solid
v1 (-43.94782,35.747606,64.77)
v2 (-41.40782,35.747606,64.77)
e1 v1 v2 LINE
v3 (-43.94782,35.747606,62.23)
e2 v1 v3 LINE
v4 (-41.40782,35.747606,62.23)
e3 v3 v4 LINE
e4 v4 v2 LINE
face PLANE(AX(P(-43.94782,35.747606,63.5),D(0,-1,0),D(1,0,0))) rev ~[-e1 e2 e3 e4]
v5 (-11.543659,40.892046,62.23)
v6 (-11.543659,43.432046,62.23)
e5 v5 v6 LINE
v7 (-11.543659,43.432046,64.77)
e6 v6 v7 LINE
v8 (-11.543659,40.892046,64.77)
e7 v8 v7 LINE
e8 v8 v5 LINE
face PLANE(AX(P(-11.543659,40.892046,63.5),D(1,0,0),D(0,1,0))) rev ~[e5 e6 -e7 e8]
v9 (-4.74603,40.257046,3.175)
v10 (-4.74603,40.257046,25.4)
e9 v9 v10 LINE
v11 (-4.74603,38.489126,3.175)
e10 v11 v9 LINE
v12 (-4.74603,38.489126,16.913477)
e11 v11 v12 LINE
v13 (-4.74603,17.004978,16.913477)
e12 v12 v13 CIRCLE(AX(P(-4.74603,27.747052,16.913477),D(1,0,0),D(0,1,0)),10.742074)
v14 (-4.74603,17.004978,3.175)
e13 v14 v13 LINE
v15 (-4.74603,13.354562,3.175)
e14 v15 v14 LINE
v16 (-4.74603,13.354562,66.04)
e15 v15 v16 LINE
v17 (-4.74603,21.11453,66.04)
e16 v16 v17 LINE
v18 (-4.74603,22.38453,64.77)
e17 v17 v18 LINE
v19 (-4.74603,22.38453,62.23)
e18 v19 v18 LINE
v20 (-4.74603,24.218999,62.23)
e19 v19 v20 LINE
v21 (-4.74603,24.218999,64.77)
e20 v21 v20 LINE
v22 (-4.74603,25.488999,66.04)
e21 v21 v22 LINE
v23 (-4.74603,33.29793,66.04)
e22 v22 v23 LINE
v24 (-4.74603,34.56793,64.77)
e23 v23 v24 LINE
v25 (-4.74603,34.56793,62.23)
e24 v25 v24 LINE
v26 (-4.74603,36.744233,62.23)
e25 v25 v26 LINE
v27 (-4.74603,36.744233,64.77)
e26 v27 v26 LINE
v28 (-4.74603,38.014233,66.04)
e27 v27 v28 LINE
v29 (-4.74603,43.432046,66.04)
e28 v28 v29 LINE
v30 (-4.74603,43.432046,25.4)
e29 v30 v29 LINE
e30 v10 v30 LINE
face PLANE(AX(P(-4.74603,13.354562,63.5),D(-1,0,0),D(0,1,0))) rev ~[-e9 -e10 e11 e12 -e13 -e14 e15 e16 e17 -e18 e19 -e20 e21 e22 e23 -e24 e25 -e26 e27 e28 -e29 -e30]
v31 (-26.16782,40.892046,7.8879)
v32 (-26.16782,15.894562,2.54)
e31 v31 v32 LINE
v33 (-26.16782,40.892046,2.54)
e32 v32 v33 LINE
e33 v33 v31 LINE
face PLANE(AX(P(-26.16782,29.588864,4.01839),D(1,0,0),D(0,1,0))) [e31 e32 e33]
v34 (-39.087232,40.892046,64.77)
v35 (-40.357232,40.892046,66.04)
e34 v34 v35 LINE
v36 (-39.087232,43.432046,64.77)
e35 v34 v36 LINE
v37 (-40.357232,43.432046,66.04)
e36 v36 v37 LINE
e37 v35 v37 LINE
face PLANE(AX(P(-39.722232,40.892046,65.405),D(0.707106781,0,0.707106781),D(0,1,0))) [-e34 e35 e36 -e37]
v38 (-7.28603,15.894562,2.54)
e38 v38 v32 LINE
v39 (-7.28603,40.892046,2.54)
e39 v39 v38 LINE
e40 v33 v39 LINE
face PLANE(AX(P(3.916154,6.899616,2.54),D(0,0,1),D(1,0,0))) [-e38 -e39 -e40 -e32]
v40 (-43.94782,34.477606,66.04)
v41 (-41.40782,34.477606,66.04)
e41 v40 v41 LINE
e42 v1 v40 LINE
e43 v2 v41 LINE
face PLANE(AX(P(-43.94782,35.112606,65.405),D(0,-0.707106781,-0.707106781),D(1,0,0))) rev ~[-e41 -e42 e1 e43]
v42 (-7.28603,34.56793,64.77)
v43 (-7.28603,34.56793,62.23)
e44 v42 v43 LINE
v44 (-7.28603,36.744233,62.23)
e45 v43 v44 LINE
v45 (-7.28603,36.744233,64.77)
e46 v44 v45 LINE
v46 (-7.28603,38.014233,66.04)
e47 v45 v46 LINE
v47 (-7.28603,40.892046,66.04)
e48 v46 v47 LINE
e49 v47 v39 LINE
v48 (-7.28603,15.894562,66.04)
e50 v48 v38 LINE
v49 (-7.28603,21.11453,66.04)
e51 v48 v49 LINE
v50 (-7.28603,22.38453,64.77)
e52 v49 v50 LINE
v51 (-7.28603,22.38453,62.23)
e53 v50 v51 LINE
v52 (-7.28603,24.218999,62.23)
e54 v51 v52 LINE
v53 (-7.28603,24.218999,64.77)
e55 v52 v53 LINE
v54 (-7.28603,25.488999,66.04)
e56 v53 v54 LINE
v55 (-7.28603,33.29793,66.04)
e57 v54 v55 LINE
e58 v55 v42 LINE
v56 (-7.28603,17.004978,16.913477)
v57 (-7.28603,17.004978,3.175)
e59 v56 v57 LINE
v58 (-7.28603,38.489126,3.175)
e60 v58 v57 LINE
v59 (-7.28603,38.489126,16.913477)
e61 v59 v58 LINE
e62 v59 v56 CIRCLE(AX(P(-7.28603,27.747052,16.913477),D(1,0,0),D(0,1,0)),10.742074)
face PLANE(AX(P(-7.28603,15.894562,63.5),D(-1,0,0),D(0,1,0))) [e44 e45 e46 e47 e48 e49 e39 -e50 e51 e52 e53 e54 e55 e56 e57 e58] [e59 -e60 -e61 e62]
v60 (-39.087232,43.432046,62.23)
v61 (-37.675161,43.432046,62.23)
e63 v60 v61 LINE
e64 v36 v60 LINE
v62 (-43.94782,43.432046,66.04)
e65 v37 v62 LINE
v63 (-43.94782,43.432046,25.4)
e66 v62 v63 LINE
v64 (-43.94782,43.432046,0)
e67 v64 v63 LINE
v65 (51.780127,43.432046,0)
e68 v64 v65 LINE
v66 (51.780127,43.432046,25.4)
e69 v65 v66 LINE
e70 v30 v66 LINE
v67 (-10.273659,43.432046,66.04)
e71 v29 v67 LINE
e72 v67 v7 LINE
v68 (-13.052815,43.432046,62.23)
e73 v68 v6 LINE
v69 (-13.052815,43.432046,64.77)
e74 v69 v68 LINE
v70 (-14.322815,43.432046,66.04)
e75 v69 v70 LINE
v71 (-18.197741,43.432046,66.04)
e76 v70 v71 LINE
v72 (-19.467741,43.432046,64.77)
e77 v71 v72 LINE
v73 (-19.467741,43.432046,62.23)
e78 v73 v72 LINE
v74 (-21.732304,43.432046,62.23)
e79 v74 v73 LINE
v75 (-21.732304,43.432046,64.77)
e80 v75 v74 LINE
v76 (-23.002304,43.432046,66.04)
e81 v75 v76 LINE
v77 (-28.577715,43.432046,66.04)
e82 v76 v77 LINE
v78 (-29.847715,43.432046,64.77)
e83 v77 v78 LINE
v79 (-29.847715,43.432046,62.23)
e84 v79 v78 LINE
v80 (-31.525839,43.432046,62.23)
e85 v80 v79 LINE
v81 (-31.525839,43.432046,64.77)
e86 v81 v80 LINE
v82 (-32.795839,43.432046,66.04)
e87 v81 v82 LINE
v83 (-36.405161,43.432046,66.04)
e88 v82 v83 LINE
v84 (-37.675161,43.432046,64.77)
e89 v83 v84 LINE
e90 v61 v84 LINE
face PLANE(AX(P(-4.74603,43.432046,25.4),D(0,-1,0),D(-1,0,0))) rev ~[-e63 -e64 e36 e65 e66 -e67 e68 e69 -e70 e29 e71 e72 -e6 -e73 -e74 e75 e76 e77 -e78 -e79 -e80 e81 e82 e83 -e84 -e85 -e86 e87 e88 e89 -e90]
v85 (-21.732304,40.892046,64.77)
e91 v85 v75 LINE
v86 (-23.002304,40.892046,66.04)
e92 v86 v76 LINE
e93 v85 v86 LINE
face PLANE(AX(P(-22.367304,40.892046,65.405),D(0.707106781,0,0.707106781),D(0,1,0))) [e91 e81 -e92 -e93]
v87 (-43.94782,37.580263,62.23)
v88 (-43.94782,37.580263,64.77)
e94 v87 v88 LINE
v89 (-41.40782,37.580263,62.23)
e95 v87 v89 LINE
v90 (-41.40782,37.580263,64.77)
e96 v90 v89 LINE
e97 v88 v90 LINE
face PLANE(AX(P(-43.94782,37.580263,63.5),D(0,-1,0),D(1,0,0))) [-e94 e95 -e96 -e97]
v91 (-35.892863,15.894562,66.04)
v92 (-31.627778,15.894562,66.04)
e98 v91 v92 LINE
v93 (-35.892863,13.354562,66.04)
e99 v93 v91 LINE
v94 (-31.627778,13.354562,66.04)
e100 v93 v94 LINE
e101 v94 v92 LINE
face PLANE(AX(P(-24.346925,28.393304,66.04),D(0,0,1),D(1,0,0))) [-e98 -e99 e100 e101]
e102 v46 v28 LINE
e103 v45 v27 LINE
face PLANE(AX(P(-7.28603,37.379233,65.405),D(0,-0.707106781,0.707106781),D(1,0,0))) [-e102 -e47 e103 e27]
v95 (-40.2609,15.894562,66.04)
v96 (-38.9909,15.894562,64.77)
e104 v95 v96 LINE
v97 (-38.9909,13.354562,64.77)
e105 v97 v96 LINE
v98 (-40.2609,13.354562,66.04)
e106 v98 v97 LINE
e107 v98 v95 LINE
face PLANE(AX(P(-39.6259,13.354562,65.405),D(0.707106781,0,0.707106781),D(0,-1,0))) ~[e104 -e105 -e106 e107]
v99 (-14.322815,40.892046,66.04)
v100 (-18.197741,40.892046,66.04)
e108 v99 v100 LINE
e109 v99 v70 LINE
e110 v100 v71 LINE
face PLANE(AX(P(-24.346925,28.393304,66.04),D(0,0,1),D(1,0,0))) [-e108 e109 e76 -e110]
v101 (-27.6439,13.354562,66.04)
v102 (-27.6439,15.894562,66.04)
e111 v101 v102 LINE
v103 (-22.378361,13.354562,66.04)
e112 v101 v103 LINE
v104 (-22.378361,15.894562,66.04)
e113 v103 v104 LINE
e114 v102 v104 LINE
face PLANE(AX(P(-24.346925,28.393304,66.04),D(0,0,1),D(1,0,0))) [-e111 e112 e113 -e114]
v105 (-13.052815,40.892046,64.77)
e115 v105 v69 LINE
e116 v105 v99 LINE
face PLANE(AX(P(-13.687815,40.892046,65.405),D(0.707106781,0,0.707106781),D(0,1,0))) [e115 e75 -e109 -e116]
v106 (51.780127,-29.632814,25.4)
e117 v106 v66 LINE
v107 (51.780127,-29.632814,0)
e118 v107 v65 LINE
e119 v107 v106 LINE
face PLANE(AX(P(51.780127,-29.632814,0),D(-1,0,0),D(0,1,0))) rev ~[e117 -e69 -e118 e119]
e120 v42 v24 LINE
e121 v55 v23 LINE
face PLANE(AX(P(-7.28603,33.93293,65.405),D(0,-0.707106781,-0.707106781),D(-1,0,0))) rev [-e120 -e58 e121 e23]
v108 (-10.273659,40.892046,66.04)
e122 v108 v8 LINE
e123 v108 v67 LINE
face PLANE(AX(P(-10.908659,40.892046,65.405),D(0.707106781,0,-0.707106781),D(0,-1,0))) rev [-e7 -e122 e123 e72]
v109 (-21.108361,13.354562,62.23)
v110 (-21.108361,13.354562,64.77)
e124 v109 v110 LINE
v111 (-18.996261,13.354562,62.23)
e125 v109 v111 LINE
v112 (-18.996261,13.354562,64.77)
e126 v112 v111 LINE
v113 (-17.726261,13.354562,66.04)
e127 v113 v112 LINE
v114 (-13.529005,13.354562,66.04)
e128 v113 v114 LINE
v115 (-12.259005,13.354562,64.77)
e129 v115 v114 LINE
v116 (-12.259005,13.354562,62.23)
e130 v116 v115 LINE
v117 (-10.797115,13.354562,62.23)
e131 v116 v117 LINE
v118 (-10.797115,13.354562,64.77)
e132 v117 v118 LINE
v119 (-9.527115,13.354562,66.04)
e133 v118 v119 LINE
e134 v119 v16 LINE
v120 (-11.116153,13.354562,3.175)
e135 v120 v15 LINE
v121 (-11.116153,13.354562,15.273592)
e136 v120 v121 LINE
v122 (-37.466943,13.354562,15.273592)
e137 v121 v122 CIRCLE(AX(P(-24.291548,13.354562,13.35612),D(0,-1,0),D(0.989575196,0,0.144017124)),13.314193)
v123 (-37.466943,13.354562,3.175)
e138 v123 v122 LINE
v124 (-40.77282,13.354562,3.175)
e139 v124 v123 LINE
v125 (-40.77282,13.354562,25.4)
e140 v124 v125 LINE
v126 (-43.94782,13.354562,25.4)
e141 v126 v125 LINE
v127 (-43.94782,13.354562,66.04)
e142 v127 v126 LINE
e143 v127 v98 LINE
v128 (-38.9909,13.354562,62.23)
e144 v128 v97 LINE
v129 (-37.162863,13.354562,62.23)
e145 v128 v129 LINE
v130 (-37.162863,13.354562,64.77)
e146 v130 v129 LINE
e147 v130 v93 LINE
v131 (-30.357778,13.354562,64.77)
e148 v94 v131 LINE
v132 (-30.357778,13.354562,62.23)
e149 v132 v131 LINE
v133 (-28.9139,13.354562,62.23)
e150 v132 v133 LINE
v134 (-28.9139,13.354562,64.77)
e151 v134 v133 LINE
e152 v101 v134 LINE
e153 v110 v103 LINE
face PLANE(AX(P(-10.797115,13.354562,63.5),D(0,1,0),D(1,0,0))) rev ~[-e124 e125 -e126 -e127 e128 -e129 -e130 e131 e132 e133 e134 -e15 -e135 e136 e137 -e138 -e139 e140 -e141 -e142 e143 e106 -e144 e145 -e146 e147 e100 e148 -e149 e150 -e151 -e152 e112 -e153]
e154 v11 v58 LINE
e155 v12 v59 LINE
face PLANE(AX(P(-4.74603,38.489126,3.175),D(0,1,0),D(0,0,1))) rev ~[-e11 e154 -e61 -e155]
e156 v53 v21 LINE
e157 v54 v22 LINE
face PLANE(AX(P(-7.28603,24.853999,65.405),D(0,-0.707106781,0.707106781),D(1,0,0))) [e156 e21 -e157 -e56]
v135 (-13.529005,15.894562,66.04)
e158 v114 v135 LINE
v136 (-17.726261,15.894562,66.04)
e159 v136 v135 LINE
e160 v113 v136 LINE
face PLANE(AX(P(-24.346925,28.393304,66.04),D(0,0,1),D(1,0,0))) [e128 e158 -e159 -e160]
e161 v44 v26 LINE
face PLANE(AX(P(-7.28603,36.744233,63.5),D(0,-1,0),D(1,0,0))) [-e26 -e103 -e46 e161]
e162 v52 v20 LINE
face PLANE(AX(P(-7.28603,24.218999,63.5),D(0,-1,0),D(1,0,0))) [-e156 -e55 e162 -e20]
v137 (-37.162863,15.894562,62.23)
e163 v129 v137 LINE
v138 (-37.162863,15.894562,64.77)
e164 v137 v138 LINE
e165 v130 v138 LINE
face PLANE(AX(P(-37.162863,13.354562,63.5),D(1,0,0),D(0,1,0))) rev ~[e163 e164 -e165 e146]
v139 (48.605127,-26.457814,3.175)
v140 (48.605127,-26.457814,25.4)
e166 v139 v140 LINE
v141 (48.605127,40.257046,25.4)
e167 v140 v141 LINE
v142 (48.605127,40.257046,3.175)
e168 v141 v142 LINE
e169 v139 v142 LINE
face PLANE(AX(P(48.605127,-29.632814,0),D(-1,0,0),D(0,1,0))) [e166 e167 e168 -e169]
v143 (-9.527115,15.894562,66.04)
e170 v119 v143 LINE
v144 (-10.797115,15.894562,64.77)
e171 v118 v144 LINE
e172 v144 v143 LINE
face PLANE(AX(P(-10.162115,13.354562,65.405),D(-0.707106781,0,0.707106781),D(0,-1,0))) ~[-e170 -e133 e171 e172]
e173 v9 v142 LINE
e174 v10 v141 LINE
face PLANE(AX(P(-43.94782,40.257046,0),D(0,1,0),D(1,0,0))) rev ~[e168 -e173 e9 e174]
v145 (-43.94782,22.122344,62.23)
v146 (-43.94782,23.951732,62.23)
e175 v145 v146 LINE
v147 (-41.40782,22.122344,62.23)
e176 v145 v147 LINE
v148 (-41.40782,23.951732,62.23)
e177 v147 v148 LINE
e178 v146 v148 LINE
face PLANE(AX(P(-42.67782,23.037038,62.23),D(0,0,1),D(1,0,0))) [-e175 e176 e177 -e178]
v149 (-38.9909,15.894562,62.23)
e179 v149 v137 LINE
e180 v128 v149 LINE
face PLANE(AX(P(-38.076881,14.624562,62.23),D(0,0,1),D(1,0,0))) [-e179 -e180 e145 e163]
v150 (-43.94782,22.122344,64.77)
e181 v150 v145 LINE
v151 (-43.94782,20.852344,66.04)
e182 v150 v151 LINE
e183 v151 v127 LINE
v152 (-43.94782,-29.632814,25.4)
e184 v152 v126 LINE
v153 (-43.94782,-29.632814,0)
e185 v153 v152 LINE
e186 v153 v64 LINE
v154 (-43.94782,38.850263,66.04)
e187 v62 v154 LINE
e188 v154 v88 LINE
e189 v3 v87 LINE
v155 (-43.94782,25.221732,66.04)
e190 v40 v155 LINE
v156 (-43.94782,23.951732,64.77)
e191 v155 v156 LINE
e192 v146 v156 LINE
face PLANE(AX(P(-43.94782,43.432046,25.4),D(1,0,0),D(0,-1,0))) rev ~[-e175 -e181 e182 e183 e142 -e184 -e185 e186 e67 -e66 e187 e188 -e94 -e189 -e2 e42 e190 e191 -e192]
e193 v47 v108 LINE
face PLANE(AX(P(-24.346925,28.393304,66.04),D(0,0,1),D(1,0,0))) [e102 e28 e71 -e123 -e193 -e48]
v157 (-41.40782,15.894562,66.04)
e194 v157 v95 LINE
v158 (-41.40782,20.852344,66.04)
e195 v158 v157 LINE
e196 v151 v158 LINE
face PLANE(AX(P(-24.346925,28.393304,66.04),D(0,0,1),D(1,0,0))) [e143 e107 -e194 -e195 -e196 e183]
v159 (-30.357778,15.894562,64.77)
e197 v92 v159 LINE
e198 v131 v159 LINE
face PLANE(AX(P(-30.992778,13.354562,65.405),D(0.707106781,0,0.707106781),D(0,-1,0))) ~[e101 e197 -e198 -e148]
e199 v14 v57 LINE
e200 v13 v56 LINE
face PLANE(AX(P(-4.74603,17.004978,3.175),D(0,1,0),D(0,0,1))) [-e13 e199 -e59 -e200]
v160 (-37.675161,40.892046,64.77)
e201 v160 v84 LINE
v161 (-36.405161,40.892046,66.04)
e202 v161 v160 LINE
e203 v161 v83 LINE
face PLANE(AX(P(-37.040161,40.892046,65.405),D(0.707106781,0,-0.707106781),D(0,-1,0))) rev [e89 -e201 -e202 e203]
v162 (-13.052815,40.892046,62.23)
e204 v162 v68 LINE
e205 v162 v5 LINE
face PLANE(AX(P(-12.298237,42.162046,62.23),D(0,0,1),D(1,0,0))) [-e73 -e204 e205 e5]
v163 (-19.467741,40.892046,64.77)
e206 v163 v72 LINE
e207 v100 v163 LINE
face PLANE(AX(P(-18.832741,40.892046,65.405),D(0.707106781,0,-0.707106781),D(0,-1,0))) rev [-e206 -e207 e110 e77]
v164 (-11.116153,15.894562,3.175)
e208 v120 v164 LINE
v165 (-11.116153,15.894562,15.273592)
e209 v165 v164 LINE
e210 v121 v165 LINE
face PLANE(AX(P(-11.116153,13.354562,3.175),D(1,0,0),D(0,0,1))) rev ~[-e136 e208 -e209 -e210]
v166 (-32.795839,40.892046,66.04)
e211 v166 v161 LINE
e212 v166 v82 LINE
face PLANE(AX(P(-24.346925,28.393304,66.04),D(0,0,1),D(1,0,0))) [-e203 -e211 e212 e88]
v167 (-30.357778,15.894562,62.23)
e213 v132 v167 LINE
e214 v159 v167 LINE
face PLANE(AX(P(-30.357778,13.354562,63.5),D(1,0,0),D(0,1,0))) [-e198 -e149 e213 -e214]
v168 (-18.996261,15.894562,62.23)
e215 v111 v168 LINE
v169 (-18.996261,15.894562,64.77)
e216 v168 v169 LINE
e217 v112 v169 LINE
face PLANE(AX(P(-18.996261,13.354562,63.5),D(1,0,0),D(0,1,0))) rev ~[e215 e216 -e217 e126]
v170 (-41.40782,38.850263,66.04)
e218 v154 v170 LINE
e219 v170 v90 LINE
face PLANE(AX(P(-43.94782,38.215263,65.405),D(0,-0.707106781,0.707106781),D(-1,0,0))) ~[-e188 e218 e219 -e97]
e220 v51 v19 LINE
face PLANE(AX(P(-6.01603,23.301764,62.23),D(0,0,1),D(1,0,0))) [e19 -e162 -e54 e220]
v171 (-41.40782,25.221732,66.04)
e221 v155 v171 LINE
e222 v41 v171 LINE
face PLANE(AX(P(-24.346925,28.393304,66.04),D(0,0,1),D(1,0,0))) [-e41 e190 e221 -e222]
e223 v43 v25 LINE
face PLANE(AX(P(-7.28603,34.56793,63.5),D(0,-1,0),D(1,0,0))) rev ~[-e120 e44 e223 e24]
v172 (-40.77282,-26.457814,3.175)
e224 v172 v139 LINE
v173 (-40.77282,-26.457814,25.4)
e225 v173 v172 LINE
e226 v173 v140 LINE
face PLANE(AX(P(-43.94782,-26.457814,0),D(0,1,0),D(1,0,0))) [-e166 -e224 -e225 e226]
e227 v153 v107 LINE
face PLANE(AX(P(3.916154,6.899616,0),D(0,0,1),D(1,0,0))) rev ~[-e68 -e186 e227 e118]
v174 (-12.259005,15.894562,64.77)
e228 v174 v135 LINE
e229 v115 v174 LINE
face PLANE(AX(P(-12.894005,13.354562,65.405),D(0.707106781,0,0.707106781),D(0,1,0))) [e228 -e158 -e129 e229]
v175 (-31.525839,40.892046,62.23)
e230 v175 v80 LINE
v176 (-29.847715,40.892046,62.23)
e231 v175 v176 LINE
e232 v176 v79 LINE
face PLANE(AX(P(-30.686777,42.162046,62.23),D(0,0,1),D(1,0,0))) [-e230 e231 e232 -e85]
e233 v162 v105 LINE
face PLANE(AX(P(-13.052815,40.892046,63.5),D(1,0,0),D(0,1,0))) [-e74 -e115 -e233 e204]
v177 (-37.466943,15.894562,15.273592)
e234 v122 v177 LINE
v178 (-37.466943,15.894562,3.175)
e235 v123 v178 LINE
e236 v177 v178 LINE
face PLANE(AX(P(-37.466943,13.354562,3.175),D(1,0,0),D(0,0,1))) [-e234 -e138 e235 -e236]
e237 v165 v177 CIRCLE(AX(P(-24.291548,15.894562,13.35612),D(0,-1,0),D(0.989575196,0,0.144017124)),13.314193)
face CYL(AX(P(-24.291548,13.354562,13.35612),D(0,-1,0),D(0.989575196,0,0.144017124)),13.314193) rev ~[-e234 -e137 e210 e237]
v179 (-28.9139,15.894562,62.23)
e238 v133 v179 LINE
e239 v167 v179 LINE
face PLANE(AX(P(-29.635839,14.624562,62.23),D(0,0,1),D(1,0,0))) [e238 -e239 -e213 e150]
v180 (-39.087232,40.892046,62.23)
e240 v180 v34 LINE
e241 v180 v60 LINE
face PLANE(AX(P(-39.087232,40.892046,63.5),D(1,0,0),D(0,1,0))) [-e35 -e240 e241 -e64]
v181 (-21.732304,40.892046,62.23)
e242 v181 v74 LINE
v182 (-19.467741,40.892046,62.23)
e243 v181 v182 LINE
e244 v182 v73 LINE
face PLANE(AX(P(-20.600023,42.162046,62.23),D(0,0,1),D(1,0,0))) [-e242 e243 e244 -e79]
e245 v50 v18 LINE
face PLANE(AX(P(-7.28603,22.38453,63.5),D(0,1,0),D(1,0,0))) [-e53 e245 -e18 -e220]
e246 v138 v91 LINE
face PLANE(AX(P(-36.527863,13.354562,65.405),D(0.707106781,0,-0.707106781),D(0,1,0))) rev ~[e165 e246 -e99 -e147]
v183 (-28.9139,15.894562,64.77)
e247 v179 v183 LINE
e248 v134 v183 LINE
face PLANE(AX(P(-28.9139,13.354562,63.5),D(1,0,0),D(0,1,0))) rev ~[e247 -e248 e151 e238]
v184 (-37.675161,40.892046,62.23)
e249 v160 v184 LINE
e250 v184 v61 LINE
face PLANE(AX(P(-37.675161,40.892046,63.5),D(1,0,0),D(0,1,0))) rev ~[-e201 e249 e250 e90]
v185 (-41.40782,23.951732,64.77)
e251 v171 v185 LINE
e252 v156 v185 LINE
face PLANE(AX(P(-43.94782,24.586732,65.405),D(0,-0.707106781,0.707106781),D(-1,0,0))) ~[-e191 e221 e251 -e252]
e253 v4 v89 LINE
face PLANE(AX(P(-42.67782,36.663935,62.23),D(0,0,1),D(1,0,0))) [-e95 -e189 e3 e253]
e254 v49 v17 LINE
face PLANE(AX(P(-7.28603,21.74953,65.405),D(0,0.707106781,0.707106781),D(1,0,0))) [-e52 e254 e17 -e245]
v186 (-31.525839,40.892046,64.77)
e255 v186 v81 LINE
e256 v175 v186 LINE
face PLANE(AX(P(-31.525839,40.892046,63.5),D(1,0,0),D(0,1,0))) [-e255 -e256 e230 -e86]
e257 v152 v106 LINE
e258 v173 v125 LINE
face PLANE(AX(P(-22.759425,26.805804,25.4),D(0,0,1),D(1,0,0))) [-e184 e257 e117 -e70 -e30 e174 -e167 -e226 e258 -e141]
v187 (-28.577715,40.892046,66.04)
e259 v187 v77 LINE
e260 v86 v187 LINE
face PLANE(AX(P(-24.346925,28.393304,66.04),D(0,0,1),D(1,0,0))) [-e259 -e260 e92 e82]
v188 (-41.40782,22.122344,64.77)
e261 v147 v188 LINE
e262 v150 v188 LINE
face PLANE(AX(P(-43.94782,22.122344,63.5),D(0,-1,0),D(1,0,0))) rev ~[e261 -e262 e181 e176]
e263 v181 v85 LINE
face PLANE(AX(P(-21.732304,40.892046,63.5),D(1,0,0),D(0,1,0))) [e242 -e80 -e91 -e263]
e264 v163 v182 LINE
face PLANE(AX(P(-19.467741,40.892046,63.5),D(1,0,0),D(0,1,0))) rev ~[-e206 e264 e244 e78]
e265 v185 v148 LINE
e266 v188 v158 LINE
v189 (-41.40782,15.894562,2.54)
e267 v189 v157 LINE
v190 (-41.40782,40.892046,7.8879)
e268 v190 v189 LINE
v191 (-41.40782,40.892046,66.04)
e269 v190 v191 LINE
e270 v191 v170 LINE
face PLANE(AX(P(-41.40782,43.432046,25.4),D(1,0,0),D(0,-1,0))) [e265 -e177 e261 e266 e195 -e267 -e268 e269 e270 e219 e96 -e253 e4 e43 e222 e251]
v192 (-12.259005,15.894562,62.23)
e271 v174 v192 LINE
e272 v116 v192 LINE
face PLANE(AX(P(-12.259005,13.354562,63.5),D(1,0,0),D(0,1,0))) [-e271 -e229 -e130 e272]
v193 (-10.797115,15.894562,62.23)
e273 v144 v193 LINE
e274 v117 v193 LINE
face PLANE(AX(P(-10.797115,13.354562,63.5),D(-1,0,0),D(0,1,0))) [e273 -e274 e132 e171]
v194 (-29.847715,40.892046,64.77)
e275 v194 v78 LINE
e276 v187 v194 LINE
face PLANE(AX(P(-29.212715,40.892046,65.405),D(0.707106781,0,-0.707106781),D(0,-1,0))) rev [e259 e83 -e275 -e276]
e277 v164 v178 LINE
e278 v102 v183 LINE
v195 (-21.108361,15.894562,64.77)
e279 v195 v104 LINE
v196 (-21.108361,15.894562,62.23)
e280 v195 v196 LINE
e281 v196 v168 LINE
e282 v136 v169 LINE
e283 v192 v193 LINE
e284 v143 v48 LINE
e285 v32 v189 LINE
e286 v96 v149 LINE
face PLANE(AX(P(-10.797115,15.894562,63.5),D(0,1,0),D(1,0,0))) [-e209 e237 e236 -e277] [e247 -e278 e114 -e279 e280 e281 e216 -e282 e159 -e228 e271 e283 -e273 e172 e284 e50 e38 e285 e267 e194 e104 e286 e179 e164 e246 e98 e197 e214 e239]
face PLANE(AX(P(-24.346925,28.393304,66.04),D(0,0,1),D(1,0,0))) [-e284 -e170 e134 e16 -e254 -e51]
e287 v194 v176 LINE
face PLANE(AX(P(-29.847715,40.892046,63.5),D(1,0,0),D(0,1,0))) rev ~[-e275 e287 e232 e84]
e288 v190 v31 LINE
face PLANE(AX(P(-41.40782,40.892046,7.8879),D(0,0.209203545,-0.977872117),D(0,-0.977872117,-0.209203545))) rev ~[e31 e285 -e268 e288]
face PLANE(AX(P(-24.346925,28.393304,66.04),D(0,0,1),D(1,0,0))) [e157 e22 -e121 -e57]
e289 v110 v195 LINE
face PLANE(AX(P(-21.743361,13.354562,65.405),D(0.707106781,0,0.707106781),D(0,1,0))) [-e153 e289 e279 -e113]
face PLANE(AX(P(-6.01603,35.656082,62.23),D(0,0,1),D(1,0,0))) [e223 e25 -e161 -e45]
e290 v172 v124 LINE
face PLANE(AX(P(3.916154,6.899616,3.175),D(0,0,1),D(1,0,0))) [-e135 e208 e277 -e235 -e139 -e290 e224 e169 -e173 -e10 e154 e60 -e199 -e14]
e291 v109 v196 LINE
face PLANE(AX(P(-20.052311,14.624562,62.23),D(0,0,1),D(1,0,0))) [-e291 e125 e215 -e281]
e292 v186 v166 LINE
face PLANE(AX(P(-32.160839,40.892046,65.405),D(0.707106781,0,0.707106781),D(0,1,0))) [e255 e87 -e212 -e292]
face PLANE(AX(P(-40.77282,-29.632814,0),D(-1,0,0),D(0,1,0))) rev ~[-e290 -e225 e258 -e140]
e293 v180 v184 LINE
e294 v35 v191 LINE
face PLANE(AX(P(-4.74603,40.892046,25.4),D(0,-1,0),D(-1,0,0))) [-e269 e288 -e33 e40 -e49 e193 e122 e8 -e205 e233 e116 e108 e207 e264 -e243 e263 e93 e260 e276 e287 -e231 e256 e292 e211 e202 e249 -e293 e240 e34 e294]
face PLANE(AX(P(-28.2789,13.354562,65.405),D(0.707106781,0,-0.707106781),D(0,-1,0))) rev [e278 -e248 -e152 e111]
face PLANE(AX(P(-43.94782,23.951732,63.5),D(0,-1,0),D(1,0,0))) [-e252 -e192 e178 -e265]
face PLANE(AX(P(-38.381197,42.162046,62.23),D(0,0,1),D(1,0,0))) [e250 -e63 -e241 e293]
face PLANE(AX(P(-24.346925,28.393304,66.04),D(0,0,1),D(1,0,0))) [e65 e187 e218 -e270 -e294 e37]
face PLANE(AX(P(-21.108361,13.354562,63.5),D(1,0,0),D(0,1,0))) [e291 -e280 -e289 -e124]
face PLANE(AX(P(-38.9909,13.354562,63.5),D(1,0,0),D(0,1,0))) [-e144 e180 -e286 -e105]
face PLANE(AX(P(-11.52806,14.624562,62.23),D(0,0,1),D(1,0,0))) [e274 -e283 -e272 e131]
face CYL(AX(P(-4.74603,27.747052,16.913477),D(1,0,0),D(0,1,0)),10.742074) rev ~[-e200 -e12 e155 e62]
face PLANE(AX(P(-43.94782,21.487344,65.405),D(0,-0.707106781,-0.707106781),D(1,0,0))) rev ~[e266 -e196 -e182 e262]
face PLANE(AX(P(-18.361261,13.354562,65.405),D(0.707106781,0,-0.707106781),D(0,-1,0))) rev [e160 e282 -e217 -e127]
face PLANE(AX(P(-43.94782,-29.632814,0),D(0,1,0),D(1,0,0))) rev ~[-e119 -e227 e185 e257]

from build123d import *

# Parameters (mm, degrees)
F0_W         = 95.7279466093
F0_H         = 73.0648599565
F1_DEPTH     = 25.4
F2_T         = -3.175
F3_W         = 36.0267900012
F3_H         = 26.902483505
F4_DEPTH     = 22.225
F6_DEPTH     = 38.1
F7_T         = 2.54
F7_T3_DEPTH  = 8.255
F7_T5_DEPTH  = 8.255
F7_T7_DEPTH  = 27.305
F7_T9_DEPTH  = 31.982483505
F7_T11_DEPTH = 41.1067900012
F7_T13_DEPTH = 58.431156608
F7_T15_DEPTH = 71.7948599565
F7_T17_DEPTH = 94.4579466093
F7_T19_DEPTH = 44.8923764515
F8_W         = 26.3507906348
F8_H         = 12.0985915035
F9_DEPTH     = 3.175
F10_W        = 21.4841477573
F10_H        = 13.7384773314
F11_DEPTH    = 3.175
F13_W        = 1.8280372024
F13_H        = 2.54
F13_W_2      = 1.4438778162
F13_W_3      = 1.4618895948
F13_W_4      = 2.1120999008
F13_W_5      = 2.54
F13_H_2      = 1.8293876201
F13_H_3      = 1.8326565623
F13_W_6      = 1.4120712876
F13_W_7      = 1.6781240702
F13_W_8      = 2.2645629942
F13_W_9      = 1.5091551468
F13_H_4      = 2.1763034165
F13_H_5      = 1.8344689161
F14_DEPTH    = 1.27
F15_DEPTH    = 2.54
F16_SIZE     = 1.27
F17_SIZE     = 1.27
F18_SIZE     = 1.27
F19_SIZE     = 1.27
F20_DEPTH    = 15.24


# Not quite as in the source:
# - a shell that OpenCascade refuses in one call is made with other operations: the cavity is built on its own and cut out


with BuildPart() as f1:
    # F0 (on Top) → F1 (new body)
    with BuildSketch(Plane.XY):
        with Locations((3.9161536843, 6.8996157497)):
            Rectangle(F0_W, F0_H)
    extrude(amount=F1_DEPTH)

    # F2
    f2_openings = [f1.faces().sort_by_distance(p)[0] for p in [
        (3.916154, 6.899616, 25.4),
    ]]
    offset(amount=F2_T, openings=f2_openings)

    # F3 (on face) → F4 (join)
    with BuildSketch(Plane.XY.offset(3.175)):
        with Locations((-22.7594246197, 26.8058039755)):
            Rectangle(F3_W, F3_H)
    extrude(amount=F4_DEPTH)

    # F5 (on face) → F6 (join)
    with BuildSketch(Plane.XY.offset(25.4)):
        Polygon((-43.9478196204, 13.354562223), (-40.7728196204, 13.354562223), (-4.7460296191, 13.354562223), (-4.7460296191, 40.257045728), (-4.7460296191, 43.432045728), (-43.9478196204, 43.432045728), align=None)
    extrude(amount=F6_DEPTH)

    # F7: shell of thickness 2.54, made by hand


with BuildPart() as f7_core1:
    # F7_t2: copy of F1
    add(f1.part)

    # the walls: a layer under each face that stays
    f7_faces = [f7_core1.faces().sort_by_distance(p)[0] for p in [
        (-43.9478196204, 31.2545690686, 52.9166666667),
        (3.9161536843, 6.8996157497, 0),
        (51.7801269889, 6.8996157497, 12.7),
        (3.9161536843, -29.6328142285, 12.7),
        (-40.7568880667, -27.1973188967, 25.4),
        (-4.7460296191, 28.3933039755, 33.3375),
        (3.9161536843, 6.8996157497, 3.175),
        (21.9295486849, 40.257045728, 14.2875),
        (48.6051269889, 6.8996157497, 14.2875),
        (3.9161536843, -26.4578142285, 14.2875),
        (-40.7728196204, -6.5516260028, 14.2875),
        (-24.3469246197, 13.354562223, 33.3375),
        (35.8254692207, 43.432045728, 10.5833333333),
    ]]
    thicken(f7_faces, amount=-F7_T, mode=Mode.SUBTRACT)

    # F7_s4 → F7_t3 (cut)
    with BuildSketch(Plane.YZ.offset(-46.4878196204)):
        Polygon((13.329162223, 25.4254), (13.354562223, 22.86), (15.894562223, 22.86), (15.894562223, 25.4), align=None)
    extrude(amount=F7_T3_DEPTH, mode=Mode.SUBTRACT)

    # F7_s6 → F7_t5 (cut)
    with BuildSketch(Plane.XZ.offset(-45.972045728)):
        Polygon((-4.7206296191, 25.4254), (-4.7460296191, 22.86), (-7.2860296191, 22.86), (-7.2860296191, 25.4), align=None)
    extrude(amount=F7_T5_DEPTH, mode=Mode.SUBTRACT)

    # F7_s8 → F7_t7 (cut)
    with BuildSketch(Plane.XY.offset(0.635)):
        Polygon((-4.7206296191, 40.231645728), (-7.2860296191, 40.257045728), (-7.2860296191, 42.797045728), (-4.7460296191, 42.797045728), align=None)
        Polygon((48.5797269889, 40.231645728), (48.6051269889, 42.797045728), (51.1451269889, 42.797045728), (51.1451269889, 40.257045728), align=None)
        Polygon((48.5797269889, -26.4324142285), (51.1451269889, -26.4578142285), (51.1451269889, -28.9978142285), (48.6051269889, -28.9978142285), align=None)
        Polygon((-40.7474196204, -26.4324142285), (-40.7728196204, -28.9978142285), (-43.3128196204, -28.9978142285), (-43.3128196204, -26.4578142285), align=None)
        Polygon((-40.7474196204, 13.329162223), (-43.3128196204, 13.354562223), (-43.3128196204, 15.894562223), (-40.7728196204, 15.894562223), align=None)
    extrude(amount=F7_T7_DEPTH, mode=Mode.SUBTRACT)

    # F7_s10 → F7_t9 (cut)
    with BuildSketch(Plane.XZ.offset(-42.797045728)):
        Polygon((-4.7206296191, 3.2004), (-7.2860296191, 3.175), (-7.2860296191, 0.635), (-4.7460296191, 0.635), align=None)
    extrude(amount=F7_T9_DEPTH, mode=Mode.SUBTRACT)

    # F7_s12 → F7_t11 (cut)
    with BuildSketch(Plane.YZ.offset(-43.3128196204)):
        Polygon((13.329162223, 3.2004), (13.354562223, 0.635), (15.894562223, 0.635), (15.894562223, 3.175), align=None)
    extrude(amount=F7_T11_DEPTH, mode=Mode.SUBTRACT)

    # F7_s14 → F7_t13 (cut)
    with BuildSketch(Plane.YZ.offset(-7.2860296191)):
        Polygon((40.231645728, 3.2004), (40.257045728, 0.635), (42.797045728, 0.635), (42.797045728, 3.175), align=None)
    extrude(amount=F7_T13_DEPTH, mode=Mode.SUBTRACT)

    # F7_s16 → F7_t15 (cut)
    with BuildSketch(Plane.XZ.offset(-42.797045728)):
        Polygon((48.5797269889, 3.2004), (48.6051269889, 0.635), (51.1451269889, 0.635), (51.1451269889, 3.175), align=None)
    extrude(amount=F7_T15_DEPTH, mode=Mode.SUBTRACT)

    # F7_s18 → F7_t17 (cut)
    with BuildSketch(Plane.YZ.offset(-43.3128196204)):
        Polygon((-26.4324142285, 3.2004), (-26.4578142285, 0.635), (-28.9978142285, 0.635), (-28.9978142285, 3.175), align=None)
    extrude(amount=F7_T17_DEPTH, mode=Mode.SUBTRACT)

    # F7_s20 → F7_t19 (cut)
    with BuildSketch(Plane.XZ.offset(-15.894562223)):
        Polygon((-40.7474196204, 3.2004), (-40.7728196204, 0.635), (-43.3128196204, 0.635), (-43.3128196204, 3.175), align=None)
    extrude(amount=F7_T19_DEPTH, mode=Mode.SUBTRACT)


with BuildPart() as f1_1:
    add(f1.part)

    # what is left inside the walls is the cavity
    f7_cavity = [f7_core1.part.solids().sort_by_distance(p)[0] for p in [
        (-24.346925, 40.866646, 43.18),
    ]]
    add(f7_cavity, mode=Mode.SUBTRACT)

    # F8 (on face) → F9 (cut)
    with BuildSketch(Plane.XZ.offset(-13.354562223)):
        with BuildLine():
            ThreePointArc((-11.1161526293, 15.2735915035), (-24.2915479466, 26.6703128698), (-37.466943264, 15.2735915035))
            Line((-37.466943264, 15.2735915035), (-11.1161526293, 15.2735915035))
        make_face()
        with Locations((-24.2915479466, 9.2242957518)):
            Rectangle(F8_W, F8_H)
    extrude(amount=-F9_DEPTH, mode=Mode.SUBTRACT)

    # F10 (on face) → F11 (cut)
    with BuildSketch(Plane.YZ.offset(-4.7460296191)):
        with BuildLine():
            Line((17.0049779117, 16.9134773314), (38.489125669, 16.9134773314))
            ThreePointArc((38.489125669, 16.9134773314), (27.7470517904, 27.65555121), (17.0049779117, 16.9134773314))
        make_face()
        with Locations((27.7470517904, 10.0442386657)):
            Rectangle(F10_W, F10_H)
    extrude(amount=-F11_DEPTH, mode=Mode.SUBTRACT)

    # F13 (on face) → F14 (cut)
    with BuildSketch(Plane.XY.offset(63.5)):
        with Locations((-38.0768813193, 14.624562223)):
            Rectangle(F13_W, F13_H)
        with Locations((-29.6358391643, 14.624562223)):
            Rectangle(F13_W_2, F13_H)
        with Locations((-11.5280598402, 14.624562223)):
            Rectangle(F13_W_3, F13_H)
        with Locations((-20.0523110107, 14.624562223)):
            Rectangle(F13_W_4, F13_H)
        with Locations((-42.6778196204, 23.0370378122)):
            Rectangle(F13_W_5, F13_H_2)
        with Locations((-42.6778196204, 36.6639345884)):
            Rectangle(F13_W_5, F13_H_3)
        with Locations((-38.3811965585, 42.162045728)):
            Rectangle(F13_W_6, F13_H)
        with Locations((-30.6867770851, 42.162045728)):
            Rectangle(F13_W_7, F13_H)
        with Locations((-20.6000227481, 42.162045728)):
            Rectangle(F13_W_8, F13_H)
        with Locations((-12.2982370667, 42.162045728)):
            Rectangle(F13_W_9, F13_H)
        with Locations((-6.0160296191, 35.6560815126)):
            Rectangle(F13_W_5, F13_H_4)
        with Locations((-6.0160296191, 23.3017643914)):
            Rectangle(F13_W_5, F13_H_5)
    extrude(amount=-F14_DEPTH, mode=Mode.SUBTRACT)

    # F15 (add): faces of the model
    f15_faces = [f1_1.faces().sort_by_distance(p)[0] for p in [
        (-6.8630827973, 16.9610565444, 63.5),
        (-6.0160296191, 29.3934643269, 63.5),
        (-7.3381229169, 40.8948611138, 63.5),
        (-16.2602779455, 42.162045728, 63.5),
        (-25.7900096476, 42.162045728, 63.5),
        (-34.6005000174, 42.162045728, 63.5),
        (-41.9877249706, 40.9763533581, 63.5),
        (-42.6778196204, 29.8496689647, 63.5),
        (-42.1422453408, 17.0655675422, 63.5),
        (-33.7603203952, 14.624562223, 63.5),
        (-25.0111306086, 14.624562223, 63.5),
        (-15.6276328489, 14.624562223, 63.5),
    ]]
    extrude(f15_faces, amount=F15_DEPTH)

    # F16
    f16_edges = [f1_1.edges().sort_by_distance(p)[0] for p in [
        (-10.797115, 14.624562, 66.04),
        (-12.259005, 14.624562, 66.04),
    ]]
    chamfer(f16_edges, length=F16_SIZE)

    # F17
    f17_edges = [f1_1.edges().sort_by_distance(p)[0] for p in [
        (-6.01603, 22.38453, 66.04),
        (-6.01603, 24.218999, 66.04),
        (-6.01603, 34.56793, 66.04),
        (-6.01603, 36.744233, 66.04),
    ]]
    chamfer(f17_edges, length=F17_SIZE)

    # F18
    f18_edges = [f1_1.edges().sort_by_distance(p)[0] for p in [
        (-11.543659, 42.162046, 66.04),
        (-13.052815, 42.162046, 66.04),
        (-19.467741, 42.162046, 66.04),
        (-21.732304, 42.162046, 66.04),
        (-39.087232, 42.162046, 66.04),
        (-37.675161, 42.162046, 66.04),
        (-31.525839, 42.162046, 66.04),
        (-29.847715, 42.162046, 66.04),
    ]]
    chamfer(f18_edges, length=F18_SIZE)

    # F19
    f19_edges = [f1_1.edges().sort_by_distance(p)[0] for p in [
        (-42.67782, 37.580263, 66.04),
        (-42.67782, 35.747606, 66.04),
        (-42.67782, 23.951732, 66.04),
        (-42.67782, 22.122344, 66.04),
        (-38.9909, 14.624562, 66.04),
        (-37.162863, 14.624562, 66.04),
        (-30.357778, 14.624562, 66.04),
        (-28.9139, 14.624562, 66.04),
        (-21.108361, 14.624562, 66.04),
        (-18.996261, 14.624562, 66.04),
    ]]
    chamfer(f19_edges, length=F19_SIZE)

    # F12 (on face) → F20 (join)
    with BuildSketch(Plane.YZ.offset(-41.4078196204)):
        Polygon((40.892045728, 2.54), (40.892045728, 7.8878998756), (15.894562223, 2.54), align=None)
    extrude(amount=F20_DEPTH)


solid = f1_1.part
